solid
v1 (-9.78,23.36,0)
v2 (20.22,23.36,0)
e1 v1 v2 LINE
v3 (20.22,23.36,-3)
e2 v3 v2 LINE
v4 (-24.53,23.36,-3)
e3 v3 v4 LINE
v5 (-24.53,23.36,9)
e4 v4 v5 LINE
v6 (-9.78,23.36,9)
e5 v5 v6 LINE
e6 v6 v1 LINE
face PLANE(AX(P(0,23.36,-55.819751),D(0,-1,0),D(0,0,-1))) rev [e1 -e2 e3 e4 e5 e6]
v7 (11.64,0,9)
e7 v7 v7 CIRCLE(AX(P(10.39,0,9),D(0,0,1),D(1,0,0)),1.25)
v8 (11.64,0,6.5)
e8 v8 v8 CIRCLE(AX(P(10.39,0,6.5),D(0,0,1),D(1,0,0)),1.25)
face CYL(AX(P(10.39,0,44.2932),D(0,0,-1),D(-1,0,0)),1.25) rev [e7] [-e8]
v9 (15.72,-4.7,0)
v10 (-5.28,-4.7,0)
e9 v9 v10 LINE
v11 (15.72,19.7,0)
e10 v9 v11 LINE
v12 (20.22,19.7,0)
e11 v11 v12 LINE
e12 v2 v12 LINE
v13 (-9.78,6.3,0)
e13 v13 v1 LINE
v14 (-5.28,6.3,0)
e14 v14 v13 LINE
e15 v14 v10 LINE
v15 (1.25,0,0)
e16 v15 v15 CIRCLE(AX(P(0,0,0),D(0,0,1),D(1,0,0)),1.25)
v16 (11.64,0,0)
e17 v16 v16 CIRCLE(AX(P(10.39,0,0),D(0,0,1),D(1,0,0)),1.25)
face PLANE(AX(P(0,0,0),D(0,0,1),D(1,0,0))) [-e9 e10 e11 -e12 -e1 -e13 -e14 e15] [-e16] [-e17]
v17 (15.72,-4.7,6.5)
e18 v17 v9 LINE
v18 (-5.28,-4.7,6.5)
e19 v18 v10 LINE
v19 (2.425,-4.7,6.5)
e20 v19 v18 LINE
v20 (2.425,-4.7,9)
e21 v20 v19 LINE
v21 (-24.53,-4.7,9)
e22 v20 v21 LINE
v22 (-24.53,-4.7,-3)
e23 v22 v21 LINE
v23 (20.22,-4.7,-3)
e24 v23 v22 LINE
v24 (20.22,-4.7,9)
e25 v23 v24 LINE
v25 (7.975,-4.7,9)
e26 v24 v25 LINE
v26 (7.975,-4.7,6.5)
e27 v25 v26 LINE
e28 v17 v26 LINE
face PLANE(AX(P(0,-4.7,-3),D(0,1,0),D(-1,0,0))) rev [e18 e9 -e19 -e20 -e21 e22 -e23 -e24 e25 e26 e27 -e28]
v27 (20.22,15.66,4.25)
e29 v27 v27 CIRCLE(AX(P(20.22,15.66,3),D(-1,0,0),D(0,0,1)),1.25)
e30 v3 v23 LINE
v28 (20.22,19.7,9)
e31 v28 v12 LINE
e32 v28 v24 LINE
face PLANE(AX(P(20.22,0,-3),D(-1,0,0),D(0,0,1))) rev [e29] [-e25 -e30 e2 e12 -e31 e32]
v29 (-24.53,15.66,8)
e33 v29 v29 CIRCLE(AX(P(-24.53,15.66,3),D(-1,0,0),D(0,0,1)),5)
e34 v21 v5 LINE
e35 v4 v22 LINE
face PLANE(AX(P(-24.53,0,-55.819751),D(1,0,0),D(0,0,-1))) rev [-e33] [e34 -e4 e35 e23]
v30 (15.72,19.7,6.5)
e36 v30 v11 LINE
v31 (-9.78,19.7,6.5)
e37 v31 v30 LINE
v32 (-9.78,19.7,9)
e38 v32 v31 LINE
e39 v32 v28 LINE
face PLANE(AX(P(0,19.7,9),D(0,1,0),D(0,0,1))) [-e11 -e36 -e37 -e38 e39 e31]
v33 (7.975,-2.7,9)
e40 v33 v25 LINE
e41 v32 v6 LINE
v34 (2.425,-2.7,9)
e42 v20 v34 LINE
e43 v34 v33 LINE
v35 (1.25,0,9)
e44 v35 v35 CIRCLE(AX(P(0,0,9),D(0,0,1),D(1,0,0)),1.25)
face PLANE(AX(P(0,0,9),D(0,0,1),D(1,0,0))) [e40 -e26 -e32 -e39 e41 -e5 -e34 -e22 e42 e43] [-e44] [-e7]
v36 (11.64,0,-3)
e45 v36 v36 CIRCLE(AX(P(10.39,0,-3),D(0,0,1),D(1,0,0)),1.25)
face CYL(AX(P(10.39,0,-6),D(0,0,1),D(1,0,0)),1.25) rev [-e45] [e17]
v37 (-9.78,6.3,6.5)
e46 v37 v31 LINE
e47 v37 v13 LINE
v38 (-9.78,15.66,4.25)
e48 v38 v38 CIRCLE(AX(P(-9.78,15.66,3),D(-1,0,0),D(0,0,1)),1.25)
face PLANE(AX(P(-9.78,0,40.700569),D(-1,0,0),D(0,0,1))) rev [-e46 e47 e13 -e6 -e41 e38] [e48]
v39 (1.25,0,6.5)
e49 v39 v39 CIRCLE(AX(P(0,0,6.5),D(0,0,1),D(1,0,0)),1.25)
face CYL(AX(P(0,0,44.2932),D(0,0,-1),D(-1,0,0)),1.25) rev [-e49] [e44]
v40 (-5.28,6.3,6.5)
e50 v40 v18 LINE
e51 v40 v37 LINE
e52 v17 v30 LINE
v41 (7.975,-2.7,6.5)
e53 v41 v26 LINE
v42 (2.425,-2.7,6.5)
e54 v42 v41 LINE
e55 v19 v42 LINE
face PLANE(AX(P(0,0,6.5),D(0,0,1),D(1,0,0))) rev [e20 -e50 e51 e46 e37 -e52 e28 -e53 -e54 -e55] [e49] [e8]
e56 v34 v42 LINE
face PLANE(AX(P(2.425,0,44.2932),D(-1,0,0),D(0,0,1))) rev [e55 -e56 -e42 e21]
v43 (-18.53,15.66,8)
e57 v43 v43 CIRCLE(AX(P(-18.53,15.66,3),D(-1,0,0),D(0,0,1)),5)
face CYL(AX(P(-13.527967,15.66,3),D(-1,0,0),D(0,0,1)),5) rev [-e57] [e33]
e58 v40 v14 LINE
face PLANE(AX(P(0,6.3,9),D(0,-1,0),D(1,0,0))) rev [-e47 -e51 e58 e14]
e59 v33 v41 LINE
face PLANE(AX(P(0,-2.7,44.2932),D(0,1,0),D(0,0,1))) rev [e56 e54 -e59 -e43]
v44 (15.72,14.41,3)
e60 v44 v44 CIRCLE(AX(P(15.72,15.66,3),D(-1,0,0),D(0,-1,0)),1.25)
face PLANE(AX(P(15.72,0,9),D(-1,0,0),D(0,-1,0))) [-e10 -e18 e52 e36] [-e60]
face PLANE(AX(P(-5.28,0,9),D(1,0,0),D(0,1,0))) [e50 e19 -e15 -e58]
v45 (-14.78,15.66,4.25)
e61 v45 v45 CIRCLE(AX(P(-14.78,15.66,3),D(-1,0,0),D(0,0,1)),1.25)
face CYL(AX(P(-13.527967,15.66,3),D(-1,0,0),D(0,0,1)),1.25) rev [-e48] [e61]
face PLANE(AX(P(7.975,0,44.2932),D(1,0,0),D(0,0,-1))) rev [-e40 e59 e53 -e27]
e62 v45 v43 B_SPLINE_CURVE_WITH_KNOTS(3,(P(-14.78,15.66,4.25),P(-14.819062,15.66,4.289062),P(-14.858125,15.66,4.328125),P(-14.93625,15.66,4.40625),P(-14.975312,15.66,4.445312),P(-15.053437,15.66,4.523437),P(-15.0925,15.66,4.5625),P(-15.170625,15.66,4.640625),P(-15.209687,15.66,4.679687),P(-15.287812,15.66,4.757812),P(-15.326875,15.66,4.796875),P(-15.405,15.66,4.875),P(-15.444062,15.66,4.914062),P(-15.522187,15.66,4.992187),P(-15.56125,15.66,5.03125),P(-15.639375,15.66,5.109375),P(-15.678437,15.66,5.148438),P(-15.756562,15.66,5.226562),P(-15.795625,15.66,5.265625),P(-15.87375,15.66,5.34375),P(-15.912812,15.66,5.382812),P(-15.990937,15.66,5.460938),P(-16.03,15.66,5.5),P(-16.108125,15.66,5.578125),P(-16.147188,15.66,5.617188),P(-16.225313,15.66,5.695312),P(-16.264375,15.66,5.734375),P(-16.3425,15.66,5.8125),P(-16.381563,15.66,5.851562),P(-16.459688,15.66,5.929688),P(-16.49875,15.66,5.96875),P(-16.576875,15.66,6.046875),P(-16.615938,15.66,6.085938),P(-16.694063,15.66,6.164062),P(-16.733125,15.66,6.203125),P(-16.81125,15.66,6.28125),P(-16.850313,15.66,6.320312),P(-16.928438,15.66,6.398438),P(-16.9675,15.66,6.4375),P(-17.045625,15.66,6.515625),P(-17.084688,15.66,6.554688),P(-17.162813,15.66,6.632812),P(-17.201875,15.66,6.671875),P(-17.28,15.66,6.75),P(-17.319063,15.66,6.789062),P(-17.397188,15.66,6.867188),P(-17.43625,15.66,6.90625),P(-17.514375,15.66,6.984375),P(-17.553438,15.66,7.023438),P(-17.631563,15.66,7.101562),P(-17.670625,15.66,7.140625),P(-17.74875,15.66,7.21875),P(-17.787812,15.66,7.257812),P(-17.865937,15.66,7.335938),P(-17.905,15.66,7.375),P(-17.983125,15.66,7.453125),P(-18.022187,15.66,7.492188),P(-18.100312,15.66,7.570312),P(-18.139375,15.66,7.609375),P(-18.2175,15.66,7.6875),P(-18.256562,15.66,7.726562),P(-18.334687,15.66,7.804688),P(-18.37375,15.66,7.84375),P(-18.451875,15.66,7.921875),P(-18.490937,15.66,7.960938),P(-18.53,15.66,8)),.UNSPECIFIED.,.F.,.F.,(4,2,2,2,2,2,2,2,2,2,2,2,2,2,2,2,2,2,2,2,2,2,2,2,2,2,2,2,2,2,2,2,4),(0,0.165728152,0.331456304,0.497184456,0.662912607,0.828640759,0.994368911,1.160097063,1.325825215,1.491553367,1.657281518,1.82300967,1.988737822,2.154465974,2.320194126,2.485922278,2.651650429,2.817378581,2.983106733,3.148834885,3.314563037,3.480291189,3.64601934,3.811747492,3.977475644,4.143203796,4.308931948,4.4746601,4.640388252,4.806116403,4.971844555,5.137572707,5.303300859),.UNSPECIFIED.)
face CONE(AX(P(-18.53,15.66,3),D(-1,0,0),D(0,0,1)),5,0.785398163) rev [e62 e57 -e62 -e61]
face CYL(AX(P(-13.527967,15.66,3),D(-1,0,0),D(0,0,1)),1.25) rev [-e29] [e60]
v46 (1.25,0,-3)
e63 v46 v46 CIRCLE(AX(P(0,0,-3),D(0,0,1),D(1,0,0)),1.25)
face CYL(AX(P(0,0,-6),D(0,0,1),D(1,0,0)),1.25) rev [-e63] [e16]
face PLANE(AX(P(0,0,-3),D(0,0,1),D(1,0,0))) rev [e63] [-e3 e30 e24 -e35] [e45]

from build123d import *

# Parameters (mm, degrees)
SKETCH1_W              = 30
SKETCH1_H              = 24.4
BOSS_EXTRUDE1_DEPTH    = 3
SKETCH1_5_R            = 1.25
CUT_EXTRUDE1_DEPTH     = 6
BOSS_EXTRUDE3_START    = -3
BOSS_EXTRUDE3_DEPTH    = 3
SKETCH1_6_W            = 4.5
SKETCH1_6_H            = 11
SKETCH1_6_H_2          = 24.4
BOSS_EXTRUDE4_DEPTH    = 9
BOSS_EXTRUDE5_START    = -3
SKETCH2_6_W            = 14.75
SKETCH2_6_H            = 28.06
BOSS_EXTRUDE5_DEPTH    = 9
CUT_REVOLVE1_OUTLINE_W = 1.25
CUT_REVOLVE1_OUTLINE_H = 4.5
BOSS_EXTRUDE7_START    = 9
SKETCH1_7_W            = 2.25
SKETCH1_7_H            = 2
SKETCH1_7_W_2          = 6.505
SKETCH1_7_W_3          = 1.2
SKETCH1_7_W_4          = 6.495
SKETCH1_7_W_5          = 1.25
SKETCH1_7_R            = 1.25
BOSS_EXTRUDE7_DEPTH    = 2.5


# Read off the part's stored shape, not the designer's step: Cut-Revolve1
with BuildPart() as part:
    # Sketch1 → Boss-Extrude1 (new body)
    with BuildSketch(Plane.XY):
        with Locations((5.22, 7.5)):
            Rectangle(SKETCH1_W, SKETCH1_H)
    extrude(amount=-BOSS_EXTRUDE1_DEPTH)

    # Sketch1<5> → Cut-Extrude1 (cut)
    with BuildSketch(Plane.XY):
        Circle(SKETCH1_5_R)
        with Locations((10.39, 0)):
            Circle(SKETCH1_5_R)
    extrude(amount=-CUT_EXTRUDE1_DEPTH, mode=Mode.SUBTRACT)

    # Sketch2 → Boss-Extrude3 (add)
    with BuildSketch(Plane.XY.offset(3).offset(BOSS_EXTRUDE3_START)):
        Polygon((-9.78, -4.7), (-9.78, 16.91), (-4.78, 16.91), (-4.78, 19.7), (20.22, 19.7), (20.22, 23.36), (-24.53, 23.36), (-24.53, -4.7), align=None)
    extrude(amount=-BOSS_EXTRUDE3_DEPTH)

    # Sketch1<6> → Boss-Extrude4 (add)
    with BuildSketch(Plane.XY):
        with Locations((-7.53, 0.8)):
            Rectangle(SKETCH1_6_W, SKETCH1_6_H)
        with Locations((17.97, 7.5)):
            Rectangle(SKETCH1_6_W, SKETCH1_6_H_2)
    extrude(amount=BOSS_EXTRUDE4_DEPTH)

    # Sketch2<6> → Boss-Extrude5 (add)
    with BuildSketch(Plane.XY.offset(3).offset(BOSS_EXTRUDE5_START)):
        with Locations((-17.155, 9.33)):
            Rectangle(SKETCH2_6_W, SKETCH2_6_H)
    extrude(amount=BOSS_EXTRUDE5_DEPTH)

    # Cut-Revolve1 outline → Cut-Revolve1 (revolve, cut)
    with BuildSketch(Plane(origin=(0, 15.66, 3), x_dir=(0, 1, 0), z_dir=(0, 0, -1))):
        Polygon((5, -24.53), (5, -18.53), (1.25, -14.78), (1.25, -9.78), (0, -9.78), (0, -24.53), align=None)
        with Locations((0.625, 17.97)):
            Rectangle(CUT_REVOLVE1_OUTLINE_W, CUT_REVOLVE1_OUTLINE_H)
    revolve(axis=Axis((0, 15.66, 3), (1, 0, 0)), mode=Mode.SUBTRACT)

    # Sketch1<7> → Boss-Extrude7 (add)
    # profile 1 of 9: a face of its own
    with BuildSketch(Plane.XY.offset(BOSS_EXTRUDE7_START)):
        Polygon((-9.78, 19.7), (-9.78, 9.7), (13.47, 9.7), (15.72, 9.7), (15.72, 19.7), align=None)
    # profile 2 of 9: a face of its own
    with BuildSketch(Plane.XY.offset(BOSS_EXTRUDE7_START)):
        Polygon((13.47, 9.7), (-9.78, 9.7), (-9.78, 7.8), (-5.28, 7.8), (-5.28, 7.4), (-5.28, -2.7), (15.72, -2.7), (15.72, 7.7), (13.47, 7.7), align=None)
        with BuildLine():
            Line((-5.08, -2), (-5.08, 6.2))
            ThreePointArc((-5.08, 6.2), (-4.787106781, 6.907106781), (-4.08, 7.2))
            Line((-4.08, 7.2), (3.92, 7.2))
            Line((3.92, 7.2), (3.92, 7.5))
            Line((3.92, 7.5), (14.47, 7.5))
            ThreePointArc((14.47, 7.5), (15.177106781, 7.207106781), (15.47, 6.5))
            Line((15.47, 6.5), (15.47, -2))
            ThreePointArc((15.47, -2), (15.323553391, -2.353553391), (14.97, -2.5))
            Line((14.97, -2.5), (-4.58, -2.5))
            ThreePointArc((-4.58, -2.5), (-4.933553391, -2.353553391), (-5.08, -2))
        make_face(mode=Mode.SUBTRACT)
    # profile 3 of 9: a face of its own
    with BuildSketch(Plane.XY.offset(BOSS_EXTRUDE7_START)):
        Polygon((-5.28, 6.3), (-5.28, 7.4), (-5.28, 7.8), (-9.78, 7.8), (-9.78, 6.3), align=None)
    # profile 4 of 9: a face of its own
    with BuildSketch(Plane.XY.offset(BOSS_EXTRUDE7_START)):
        with Locations((14.595, 8.7)):
            Rectangle(SKETCH1_7_W, SKETCH1_7_H)
    # profile 5 of 9: a face of its own
    with BuildSketch(Plane.XY.offset(BOSS_EXTRUDE7_START)):
        with Locations((-0.8275, -3.7)):
            Rectangle(SKETCH1_7_W_2, SKETCH1_7_H)
    # profile 6 of 9: a face of its own
    with BuildSketch(Plane.XY.offset(BOSS_EXTRUDE7_START)):
        with Locations((-4.68, -3.7)):
            Rectangle(SKETCH1_7_W_3, SKETCH1_7_H)
    # profile 7 of 9: a face of its own
    with BuildSketch(Plane.XY.offset(BOSS_EXTRUDE7_START)):
        with Locations((11.2225, -3.7)):
            Rectangle(SKETCH1_7_W_4, SKETCH1_7_H)
    # profile 8 of 9: a face of its own
    with BuildSketch(Plane.XY.offset(BOSS_EXTRUDE7_START)):
        with Locations((15.095, -3.7)):
            Rectangle(SKETCH1_7_W_5, SKETCH1_7_H)
    # profile 9 of 9: a face of its own
    with BuildSketch(Plane.XY.offset(BOSS_EXTRUDE7_START)):
        with BuildLine():
            ThreePointArc((-5.08, 6.2), (-4.787106781, 6.907106781), (-4.08, 7.2))
            Line((-4.08, 7.2), (3.92, 7.2))
            Line((3.92, 7.2), (3.92, 7.5))
            Line((3.92, 7.5), (14.47, 7.5))
            ThreePointArc((14.47, 7.5), (15.177106781, 7.207106781), (15.47, 6.5))
            Line((15.47, 6.5), (15.47, -2))
            ThreePointArc((15.47, -2), (15.323553391, -2.353553391), (14.97, -2.5))
            Line((14.97, -2.5), (-4.58, -2.5))
            ThreePointArc((-4.58, -2.5), (-4.933553391, -2.353553391), (-5.08, -2))
            Line((-5.08, -2), (-5.08, 6.2))
        make_face()
        with Locations((10.39, 0)):
            Circle(SKETCH1_7_R, mode=Mode.SUBTRACT)
        Circle(SKETCH1_7_R, mode=Mode.SUBTRACT)
    extrude(amount=-BOSS_EXTRUDE7_DEPTH)


solid = part.part
